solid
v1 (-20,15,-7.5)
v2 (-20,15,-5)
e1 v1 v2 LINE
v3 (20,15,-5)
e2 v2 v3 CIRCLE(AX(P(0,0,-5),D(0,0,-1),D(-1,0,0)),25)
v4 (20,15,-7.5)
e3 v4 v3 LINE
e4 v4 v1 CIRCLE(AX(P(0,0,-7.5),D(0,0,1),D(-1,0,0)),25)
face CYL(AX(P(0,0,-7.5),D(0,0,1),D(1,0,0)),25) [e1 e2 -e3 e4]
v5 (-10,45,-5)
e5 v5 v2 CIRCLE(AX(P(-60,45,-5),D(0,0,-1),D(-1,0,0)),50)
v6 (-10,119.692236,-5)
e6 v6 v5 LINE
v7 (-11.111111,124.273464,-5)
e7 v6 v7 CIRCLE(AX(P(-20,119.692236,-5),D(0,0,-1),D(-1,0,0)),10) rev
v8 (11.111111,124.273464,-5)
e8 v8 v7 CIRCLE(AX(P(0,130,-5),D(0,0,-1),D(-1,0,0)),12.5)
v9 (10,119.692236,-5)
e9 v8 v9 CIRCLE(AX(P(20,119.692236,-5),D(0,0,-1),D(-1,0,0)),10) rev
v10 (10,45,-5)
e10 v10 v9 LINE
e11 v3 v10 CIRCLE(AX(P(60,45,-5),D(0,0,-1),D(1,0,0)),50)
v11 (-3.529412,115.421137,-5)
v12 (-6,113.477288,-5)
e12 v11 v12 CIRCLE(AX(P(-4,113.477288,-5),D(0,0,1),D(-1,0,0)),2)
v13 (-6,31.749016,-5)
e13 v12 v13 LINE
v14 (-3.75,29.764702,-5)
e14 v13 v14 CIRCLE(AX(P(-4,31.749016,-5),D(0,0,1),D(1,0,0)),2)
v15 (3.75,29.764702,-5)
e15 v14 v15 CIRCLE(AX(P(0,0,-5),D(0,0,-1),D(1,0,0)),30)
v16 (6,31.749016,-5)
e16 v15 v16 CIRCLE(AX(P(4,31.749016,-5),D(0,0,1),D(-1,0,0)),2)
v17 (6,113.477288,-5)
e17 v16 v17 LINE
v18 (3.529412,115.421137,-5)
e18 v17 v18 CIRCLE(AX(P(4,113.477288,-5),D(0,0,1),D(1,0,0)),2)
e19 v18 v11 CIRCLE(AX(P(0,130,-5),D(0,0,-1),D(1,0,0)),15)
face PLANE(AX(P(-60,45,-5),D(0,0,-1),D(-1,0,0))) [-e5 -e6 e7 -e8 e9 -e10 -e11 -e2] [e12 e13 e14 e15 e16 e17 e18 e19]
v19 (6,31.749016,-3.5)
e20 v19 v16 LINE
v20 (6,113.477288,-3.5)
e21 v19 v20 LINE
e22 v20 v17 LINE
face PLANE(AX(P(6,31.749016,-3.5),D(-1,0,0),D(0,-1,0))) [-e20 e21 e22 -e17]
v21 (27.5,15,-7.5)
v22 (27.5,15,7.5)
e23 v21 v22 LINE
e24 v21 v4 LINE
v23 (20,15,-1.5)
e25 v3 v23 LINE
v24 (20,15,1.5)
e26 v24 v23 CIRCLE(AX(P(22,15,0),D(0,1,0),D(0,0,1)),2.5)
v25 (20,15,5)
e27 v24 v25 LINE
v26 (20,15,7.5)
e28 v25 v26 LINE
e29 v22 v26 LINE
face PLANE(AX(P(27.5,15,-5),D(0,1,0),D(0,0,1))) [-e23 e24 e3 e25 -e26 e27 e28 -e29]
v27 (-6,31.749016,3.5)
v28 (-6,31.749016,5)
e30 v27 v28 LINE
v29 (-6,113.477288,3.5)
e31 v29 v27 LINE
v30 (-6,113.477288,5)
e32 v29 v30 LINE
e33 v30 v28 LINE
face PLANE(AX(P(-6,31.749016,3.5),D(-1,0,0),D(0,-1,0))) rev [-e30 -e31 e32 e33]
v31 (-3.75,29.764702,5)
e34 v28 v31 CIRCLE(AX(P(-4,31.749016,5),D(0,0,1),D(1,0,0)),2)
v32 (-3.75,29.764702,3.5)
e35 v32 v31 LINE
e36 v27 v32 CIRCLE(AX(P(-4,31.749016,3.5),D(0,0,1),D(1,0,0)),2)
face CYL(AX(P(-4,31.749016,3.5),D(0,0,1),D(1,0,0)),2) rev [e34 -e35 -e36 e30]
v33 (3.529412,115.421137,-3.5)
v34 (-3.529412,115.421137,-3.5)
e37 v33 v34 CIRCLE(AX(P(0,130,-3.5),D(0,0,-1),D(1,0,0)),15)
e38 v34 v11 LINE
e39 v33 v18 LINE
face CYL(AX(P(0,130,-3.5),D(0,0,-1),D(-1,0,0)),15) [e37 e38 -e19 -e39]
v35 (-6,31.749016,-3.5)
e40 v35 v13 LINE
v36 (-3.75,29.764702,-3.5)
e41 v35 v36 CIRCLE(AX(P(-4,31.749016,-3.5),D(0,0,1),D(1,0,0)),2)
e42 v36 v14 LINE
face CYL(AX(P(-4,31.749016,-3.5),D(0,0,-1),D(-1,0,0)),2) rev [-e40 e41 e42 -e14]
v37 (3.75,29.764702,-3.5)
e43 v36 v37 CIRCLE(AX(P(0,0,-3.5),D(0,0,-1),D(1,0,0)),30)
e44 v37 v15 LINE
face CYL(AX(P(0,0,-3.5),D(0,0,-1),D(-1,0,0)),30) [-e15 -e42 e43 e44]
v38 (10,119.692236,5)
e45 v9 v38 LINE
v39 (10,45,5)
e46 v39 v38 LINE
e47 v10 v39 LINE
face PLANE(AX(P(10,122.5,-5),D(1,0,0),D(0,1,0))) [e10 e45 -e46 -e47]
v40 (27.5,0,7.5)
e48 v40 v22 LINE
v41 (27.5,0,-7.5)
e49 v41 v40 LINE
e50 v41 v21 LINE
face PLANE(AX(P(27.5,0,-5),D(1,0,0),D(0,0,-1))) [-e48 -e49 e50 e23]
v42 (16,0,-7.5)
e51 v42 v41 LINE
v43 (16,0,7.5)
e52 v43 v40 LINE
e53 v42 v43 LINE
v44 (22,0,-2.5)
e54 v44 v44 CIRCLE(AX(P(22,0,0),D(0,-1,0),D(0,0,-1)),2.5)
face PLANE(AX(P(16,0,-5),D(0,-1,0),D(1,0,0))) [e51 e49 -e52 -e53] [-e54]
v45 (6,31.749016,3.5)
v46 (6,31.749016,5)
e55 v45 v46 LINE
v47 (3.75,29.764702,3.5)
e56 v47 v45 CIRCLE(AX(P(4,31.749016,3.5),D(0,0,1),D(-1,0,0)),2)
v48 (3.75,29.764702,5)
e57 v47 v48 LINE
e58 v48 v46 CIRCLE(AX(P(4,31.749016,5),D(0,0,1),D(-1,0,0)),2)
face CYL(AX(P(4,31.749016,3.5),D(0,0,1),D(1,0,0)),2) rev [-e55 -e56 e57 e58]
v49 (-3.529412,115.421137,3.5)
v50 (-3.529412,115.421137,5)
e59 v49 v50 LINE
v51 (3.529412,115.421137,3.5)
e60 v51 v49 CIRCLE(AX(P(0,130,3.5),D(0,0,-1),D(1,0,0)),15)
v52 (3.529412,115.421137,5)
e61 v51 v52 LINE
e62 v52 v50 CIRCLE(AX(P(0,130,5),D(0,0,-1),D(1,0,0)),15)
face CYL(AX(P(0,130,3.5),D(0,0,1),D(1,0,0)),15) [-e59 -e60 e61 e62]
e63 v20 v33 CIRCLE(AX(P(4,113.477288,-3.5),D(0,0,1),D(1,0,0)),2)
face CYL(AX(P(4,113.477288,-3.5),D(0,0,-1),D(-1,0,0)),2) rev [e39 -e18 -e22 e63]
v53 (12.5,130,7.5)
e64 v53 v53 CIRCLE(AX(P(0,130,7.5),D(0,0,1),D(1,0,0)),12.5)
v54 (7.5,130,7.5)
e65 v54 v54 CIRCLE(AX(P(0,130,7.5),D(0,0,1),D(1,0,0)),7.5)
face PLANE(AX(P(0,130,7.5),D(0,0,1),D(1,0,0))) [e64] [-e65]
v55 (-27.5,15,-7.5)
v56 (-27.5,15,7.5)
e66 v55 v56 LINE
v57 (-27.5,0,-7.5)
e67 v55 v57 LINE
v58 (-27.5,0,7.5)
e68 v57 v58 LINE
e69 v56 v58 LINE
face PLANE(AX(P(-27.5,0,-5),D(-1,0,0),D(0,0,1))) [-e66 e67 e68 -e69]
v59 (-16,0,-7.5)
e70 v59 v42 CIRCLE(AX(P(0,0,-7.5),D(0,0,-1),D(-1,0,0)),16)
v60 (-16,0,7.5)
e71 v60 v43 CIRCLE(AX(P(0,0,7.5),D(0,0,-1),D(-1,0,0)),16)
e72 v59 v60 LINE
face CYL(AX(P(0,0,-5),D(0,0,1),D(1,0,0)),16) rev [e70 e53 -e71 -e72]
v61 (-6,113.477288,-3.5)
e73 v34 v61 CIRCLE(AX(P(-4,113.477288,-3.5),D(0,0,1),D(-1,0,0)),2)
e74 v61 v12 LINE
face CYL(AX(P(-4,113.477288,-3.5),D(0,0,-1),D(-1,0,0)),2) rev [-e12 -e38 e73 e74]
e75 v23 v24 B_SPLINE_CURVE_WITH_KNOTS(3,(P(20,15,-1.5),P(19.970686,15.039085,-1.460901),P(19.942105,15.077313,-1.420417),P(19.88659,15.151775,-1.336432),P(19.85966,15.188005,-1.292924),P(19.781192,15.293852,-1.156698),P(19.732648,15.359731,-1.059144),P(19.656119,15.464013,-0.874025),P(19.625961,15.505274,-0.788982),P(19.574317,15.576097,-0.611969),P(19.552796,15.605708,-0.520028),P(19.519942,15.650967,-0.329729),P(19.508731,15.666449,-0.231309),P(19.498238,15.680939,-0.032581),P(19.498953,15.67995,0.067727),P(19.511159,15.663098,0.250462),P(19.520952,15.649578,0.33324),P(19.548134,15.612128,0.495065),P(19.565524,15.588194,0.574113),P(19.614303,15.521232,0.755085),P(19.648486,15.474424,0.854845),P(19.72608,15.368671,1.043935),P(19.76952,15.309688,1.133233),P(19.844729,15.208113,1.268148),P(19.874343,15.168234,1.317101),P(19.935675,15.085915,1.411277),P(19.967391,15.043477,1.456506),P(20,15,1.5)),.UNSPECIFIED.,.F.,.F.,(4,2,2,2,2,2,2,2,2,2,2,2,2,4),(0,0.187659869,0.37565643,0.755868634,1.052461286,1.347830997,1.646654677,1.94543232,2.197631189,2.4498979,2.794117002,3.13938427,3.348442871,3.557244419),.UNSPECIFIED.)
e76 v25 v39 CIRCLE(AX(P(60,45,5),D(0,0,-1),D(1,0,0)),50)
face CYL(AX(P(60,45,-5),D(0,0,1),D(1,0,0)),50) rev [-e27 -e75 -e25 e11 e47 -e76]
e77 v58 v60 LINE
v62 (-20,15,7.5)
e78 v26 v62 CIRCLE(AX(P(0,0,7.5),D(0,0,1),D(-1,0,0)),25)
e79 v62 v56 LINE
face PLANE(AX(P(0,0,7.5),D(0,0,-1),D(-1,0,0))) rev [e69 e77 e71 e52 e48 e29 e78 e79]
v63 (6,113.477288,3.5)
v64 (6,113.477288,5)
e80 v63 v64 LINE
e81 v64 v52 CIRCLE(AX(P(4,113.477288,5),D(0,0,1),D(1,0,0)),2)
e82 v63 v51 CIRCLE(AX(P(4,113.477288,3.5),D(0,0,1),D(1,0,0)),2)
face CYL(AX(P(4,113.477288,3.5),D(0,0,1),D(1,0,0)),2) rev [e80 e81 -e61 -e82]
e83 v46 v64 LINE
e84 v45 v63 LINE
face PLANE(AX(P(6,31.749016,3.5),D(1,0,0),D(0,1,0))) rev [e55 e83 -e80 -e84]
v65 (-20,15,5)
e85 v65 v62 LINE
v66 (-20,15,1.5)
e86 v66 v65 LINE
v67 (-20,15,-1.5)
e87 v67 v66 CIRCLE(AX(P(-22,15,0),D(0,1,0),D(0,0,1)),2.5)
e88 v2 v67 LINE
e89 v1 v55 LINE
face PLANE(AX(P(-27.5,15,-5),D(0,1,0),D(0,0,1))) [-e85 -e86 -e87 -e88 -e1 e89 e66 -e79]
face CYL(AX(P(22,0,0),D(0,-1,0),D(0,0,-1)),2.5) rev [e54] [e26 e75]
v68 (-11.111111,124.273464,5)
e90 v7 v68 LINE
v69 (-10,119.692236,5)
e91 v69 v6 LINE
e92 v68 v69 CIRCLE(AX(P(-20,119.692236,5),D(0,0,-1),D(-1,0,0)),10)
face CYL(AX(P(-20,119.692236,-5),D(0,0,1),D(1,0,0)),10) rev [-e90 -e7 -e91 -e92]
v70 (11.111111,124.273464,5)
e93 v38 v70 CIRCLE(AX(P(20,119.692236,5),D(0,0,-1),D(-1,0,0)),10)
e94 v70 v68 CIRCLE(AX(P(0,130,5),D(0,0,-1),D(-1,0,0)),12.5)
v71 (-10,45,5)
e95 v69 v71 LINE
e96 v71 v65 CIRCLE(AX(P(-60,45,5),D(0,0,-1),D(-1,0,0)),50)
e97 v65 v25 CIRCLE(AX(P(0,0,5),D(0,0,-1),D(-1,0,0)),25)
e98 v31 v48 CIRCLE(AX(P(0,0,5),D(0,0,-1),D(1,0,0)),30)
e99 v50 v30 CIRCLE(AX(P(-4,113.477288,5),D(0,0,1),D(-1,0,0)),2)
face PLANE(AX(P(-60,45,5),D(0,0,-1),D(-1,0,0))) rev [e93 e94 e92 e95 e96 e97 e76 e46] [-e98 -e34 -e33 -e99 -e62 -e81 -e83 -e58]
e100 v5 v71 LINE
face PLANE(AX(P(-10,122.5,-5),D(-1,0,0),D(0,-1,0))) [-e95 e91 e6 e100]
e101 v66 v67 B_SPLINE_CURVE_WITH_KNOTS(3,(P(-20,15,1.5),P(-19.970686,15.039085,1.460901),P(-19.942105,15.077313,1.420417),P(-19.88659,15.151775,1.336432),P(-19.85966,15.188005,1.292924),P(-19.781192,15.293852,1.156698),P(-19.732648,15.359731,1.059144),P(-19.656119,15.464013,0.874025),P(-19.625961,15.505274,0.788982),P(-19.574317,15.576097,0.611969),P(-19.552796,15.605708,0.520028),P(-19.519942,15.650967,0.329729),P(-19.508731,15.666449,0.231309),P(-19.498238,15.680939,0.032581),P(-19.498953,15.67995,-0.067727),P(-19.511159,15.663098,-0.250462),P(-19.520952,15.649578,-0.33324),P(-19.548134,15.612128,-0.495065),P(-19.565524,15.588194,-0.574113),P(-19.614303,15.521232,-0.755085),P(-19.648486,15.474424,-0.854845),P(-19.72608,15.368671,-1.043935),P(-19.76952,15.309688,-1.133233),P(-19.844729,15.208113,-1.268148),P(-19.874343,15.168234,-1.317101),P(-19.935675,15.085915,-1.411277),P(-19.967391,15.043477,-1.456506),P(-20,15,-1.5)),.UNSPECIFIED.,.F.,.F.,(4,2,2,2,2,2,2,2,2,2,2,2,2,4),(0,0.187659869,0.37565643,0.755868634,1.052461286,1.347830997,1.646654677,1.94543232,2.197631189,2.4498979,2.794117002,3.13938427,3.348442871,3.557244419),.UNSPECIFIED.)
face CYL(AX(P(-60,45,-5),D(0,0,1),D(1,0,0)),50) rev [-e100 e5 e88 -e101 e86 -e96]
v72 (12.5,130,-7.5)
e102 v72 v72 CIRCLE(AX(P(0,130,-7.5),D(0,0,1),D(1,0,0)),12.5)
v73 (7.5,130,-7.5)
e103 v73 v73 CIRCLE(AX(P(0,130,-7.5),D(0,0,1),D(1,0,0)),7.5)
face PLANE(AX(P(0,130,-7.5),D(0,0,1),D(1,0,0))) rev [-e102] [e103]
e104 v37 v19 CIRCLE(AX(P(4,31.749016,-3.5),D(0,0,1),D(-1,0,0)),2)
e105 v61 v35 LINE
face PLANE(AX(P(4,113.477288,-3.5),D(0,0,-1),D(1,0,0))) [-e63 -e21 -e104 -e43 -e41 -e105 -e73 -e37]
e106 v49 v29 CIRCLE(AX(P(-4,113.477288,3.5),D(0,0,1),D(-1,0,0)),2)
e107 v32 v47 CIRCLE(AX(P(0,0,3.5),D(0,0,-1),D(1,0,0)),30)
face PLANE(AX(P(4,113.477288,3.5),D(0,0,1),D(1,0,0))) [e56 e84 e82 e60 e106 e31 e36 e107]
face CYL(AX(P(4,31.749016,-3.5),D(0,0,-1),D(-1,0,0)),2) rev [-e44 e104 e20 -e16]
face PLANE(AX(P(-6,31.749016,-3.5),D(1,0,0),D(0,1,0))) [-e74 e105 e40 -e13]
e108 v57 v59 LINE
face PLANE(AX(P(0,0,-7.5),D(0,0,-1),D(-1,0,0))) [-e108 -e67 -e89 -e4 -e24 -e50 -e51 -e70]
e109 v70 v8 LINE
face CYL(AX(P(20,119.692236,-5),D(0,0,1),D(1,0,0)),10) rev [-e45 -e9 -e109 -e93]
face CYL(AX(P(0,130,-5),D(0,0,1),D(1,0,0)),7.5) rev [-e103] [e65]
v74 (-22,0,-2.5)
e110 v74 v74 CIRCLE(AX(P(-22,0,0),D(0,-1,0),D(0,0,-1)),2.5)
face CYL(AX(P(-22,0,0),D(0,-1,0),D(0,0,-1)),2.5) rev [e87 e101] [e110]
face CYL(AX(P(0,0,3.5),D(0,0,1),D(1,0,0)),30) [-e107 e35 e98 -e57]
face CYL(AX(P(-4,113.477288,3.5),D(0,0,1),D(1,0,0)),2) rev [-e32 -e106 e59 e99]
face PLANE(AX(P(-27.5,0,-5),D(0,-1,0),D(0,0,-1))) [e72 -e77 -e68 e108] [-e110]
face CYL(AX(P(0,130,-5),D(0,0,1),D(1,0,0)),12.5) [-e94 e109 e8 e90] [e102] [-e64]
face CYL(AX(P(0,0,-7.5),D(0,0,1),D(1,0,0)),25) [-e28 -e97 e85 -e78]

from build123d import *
from build123d.topology import SkipClean

# Parameters (mm, degrees)
BOSS_EXTRUDE1_DEPTH      = 5
BOSS_EXTRUDE1_DEPTH_BACK = 5
SKETCH2_R                = 7.5
BOSS_EXTRUDE2_DEPTH      = 7.5
BOSS_EXTRUDE2_DEPTH_BACK = 7.5
BOSS_EXTRUDE3_DEPTH      = 7.5
BOSS_EXTRUDE3_DEPTH_BACK = 7.5
SKETCH5_R                = 12.5
SKETCH5_R_2              = 7.5
CUT_EXTRUDE1_DEPTH       = 1.5
FILLET1_R                = 10
TAP_DRILL_FOR_M6_TAP1_D  = 5


with BuildPart() as part:
    # Sketch2 → Boss-Extrude1 (new, two sides: drawn at the far end of the back side and taken through both)
    with BuildSketch(Plane.XY.offset(-BOSS_EXTRUDE1_DEPTH_BACK)):
        with BuildLine():
            Line((-27.5, 0), (-16, 0))
            ThreePointArc((-16, 0), (0, 16), (16, 0))
            Line((16, 0), (27.5, 0))
            Line((27.5, 0), (27.5, 15))
            Line((27.5, 15), (20, 15))
            ThreePointArc((20, 15), (12.565835097, 29.188611699), (10, 45))
            Line((10, 45), (10, 122.5))
            ThreePointArc((10, 122.5), (0, 142.5), (-10, 122.5))
            Line((-10, 122.5), (-10, 45))
            ThreePointArc((-10, 45), (-12.565835097, 29.188611699), (-20, 15))
            Line((-20, 15), (-27.5, 15))
            Line((-27.5, 15), (-27.5, 0))
        make_face()
        with Locations((0, 130)):
            Circle(SKETCH2_R, mode=Mode.SUBTRACT)
    extrude(amount=BOSS_EXTRUDE1_DEPTH + BOSS_EXTRUDE1_DEPTH_BACK)

    # Sketch3 → Boss-Extrude2 (add, two sides: drawn at the far end of the back side and taken through both)
    with BuildSketch(Plane.XY.offset(-BOSS_EXTRUDE2_DEPTH_BACK)):
        with BuildLine():
            Line((-27.5, 15), (-27.5, 0))
            Line((-27.5, 0), (-16, 0))
            ThreePointArc((-16, 0), (0, 16), (16, 0))
            Line((16, 0), (27.5, 0))
            Line((27.5, 0), (27.5, 15))
            Line((27.5, 15), (20, 15))
            ThreePointArc((20, 15), (0, 25), (-20, 15))
            Line((-20, 15), (-27.5, 15))
        make_face()
    extrude(amount=BOSS_EXTRUDE2_DEPTH + BOSS_EXTRUDE2_DEPTH_BACK)

    # Sketch5 → Boss-Extrude3 (add, two sides: drawn at the far end of the back side and taken through both)
    with SkipClean():  # the faces are left unmerged after this step: merging them gives an invalid solid
        with BuildSketch(Plane.XY.offset(-BOSS_EXTRUDE3_DEPTH_BACK)):
            with Locations((0, 130)):
                Circle(SKETCH5_R)
            with Locations((0, 130)):
                Circle(SKETCH5_R_2, mode=Mode.SUBTRACT)
        extrude(amount=BOSS_EXTRUDE3_DEPTH + BOSS_EXTRUDE3_DEPTH_BACK)
    add(part.part.scale(1), mode=Mode.REPLACE)  # the faces are merged on a copy

    # Sketch6 → Cut-Extrude1 (cut)
    with BuildSketch(Plane.XY.offset(5)):
        with BuildLine():
            Line((-6, 31.749015733), (-6, 113.477288358))
            ThreePointArc((-6, 113.477288358), (-5.236693885, 115.049098854), (-3.529411765, 115.421136787))
            ThreePointArc((-3.529411765, 115.421136787), (0, 115), (3.529411765, 115.421136787))
            ThreePointArc((3.529411765, 115.421136787), (5.236693885, 115.049098854), (6, 113.477288358))
            Line((6, 113.477288358), (6, 31.749015733))
            ThreePointArc((6, 31.749015733), (5.322875656, 30.249015733), (3.75, 29.764702249))
            ThreePointArc((3.75, 29.764702249), (0, 30), (-3.75, 29.764702249))
            ThreePointArc((-3.75, 29.764702249), (-5.322875656, 30.249015733), (-6, 31.749015733))
        make_face()
    cut_extrude1 = extrude(amount=-CUT_EXTRUDE1_DEPTH, mode=Mode.SUBTRACT)

    # Mirror1: Cut-Extrude1 across plane
    add(cut_extrude1.mirror(Plane.XY), mode=Mode.SUBTRACT)

    # Fillet1
    # the kernel refuses this fillet: 10 mm, written as the material it adds along each edge
    with BuildSketch(Plane(origin=(-10, 122.5, 5), x_dir=(0, -1, 0), z_dir=(0, 0, -1))) as fillet1_piece_1:
        with BuildLine():
            CenterArc((2.807764064, 10), FILLET1_R, 242.733955549, 27.266044451)
            ThreePointArc((-1.773464409, 1.111111111), (-0.863438171, 0.592735581), (0, 0))
            Line((0, 0), (2.807764064, 0))
        make_face()
    extrude(amount=10)
    with BuildSketch(Plane(origin=(10, 122.5, 5), x_dir=(0.5309249463264099, 0.8474188464792949, 0), z_dir=(0, 0, -1))) as fillet1_piece_2:
        with BuildLine():
            CenterArc((2.929897279, 9.96490045), FILLET1_R, 237.932028952, 27.266044451)
            Line((-2.379352184, 1.490711985), (0, 0))
            ThreePointArc((0, 0), (1.046391885, 0.043874438), (2.092783771, 0))
        make_face()
    extrude(amount=10)

    # Tap Drill for M6 Tap1 (through all)
    with Locations(Plane(origin=(0, 0, 0), x_dir=(-1, 0, 0), z_dir=(0, -1, 0))):
        with Locations((22, 0), (-22, 0)):
            Hole(TAP_DRILL_FOR_M6_TAP1_D / 2)


solid = part.part
